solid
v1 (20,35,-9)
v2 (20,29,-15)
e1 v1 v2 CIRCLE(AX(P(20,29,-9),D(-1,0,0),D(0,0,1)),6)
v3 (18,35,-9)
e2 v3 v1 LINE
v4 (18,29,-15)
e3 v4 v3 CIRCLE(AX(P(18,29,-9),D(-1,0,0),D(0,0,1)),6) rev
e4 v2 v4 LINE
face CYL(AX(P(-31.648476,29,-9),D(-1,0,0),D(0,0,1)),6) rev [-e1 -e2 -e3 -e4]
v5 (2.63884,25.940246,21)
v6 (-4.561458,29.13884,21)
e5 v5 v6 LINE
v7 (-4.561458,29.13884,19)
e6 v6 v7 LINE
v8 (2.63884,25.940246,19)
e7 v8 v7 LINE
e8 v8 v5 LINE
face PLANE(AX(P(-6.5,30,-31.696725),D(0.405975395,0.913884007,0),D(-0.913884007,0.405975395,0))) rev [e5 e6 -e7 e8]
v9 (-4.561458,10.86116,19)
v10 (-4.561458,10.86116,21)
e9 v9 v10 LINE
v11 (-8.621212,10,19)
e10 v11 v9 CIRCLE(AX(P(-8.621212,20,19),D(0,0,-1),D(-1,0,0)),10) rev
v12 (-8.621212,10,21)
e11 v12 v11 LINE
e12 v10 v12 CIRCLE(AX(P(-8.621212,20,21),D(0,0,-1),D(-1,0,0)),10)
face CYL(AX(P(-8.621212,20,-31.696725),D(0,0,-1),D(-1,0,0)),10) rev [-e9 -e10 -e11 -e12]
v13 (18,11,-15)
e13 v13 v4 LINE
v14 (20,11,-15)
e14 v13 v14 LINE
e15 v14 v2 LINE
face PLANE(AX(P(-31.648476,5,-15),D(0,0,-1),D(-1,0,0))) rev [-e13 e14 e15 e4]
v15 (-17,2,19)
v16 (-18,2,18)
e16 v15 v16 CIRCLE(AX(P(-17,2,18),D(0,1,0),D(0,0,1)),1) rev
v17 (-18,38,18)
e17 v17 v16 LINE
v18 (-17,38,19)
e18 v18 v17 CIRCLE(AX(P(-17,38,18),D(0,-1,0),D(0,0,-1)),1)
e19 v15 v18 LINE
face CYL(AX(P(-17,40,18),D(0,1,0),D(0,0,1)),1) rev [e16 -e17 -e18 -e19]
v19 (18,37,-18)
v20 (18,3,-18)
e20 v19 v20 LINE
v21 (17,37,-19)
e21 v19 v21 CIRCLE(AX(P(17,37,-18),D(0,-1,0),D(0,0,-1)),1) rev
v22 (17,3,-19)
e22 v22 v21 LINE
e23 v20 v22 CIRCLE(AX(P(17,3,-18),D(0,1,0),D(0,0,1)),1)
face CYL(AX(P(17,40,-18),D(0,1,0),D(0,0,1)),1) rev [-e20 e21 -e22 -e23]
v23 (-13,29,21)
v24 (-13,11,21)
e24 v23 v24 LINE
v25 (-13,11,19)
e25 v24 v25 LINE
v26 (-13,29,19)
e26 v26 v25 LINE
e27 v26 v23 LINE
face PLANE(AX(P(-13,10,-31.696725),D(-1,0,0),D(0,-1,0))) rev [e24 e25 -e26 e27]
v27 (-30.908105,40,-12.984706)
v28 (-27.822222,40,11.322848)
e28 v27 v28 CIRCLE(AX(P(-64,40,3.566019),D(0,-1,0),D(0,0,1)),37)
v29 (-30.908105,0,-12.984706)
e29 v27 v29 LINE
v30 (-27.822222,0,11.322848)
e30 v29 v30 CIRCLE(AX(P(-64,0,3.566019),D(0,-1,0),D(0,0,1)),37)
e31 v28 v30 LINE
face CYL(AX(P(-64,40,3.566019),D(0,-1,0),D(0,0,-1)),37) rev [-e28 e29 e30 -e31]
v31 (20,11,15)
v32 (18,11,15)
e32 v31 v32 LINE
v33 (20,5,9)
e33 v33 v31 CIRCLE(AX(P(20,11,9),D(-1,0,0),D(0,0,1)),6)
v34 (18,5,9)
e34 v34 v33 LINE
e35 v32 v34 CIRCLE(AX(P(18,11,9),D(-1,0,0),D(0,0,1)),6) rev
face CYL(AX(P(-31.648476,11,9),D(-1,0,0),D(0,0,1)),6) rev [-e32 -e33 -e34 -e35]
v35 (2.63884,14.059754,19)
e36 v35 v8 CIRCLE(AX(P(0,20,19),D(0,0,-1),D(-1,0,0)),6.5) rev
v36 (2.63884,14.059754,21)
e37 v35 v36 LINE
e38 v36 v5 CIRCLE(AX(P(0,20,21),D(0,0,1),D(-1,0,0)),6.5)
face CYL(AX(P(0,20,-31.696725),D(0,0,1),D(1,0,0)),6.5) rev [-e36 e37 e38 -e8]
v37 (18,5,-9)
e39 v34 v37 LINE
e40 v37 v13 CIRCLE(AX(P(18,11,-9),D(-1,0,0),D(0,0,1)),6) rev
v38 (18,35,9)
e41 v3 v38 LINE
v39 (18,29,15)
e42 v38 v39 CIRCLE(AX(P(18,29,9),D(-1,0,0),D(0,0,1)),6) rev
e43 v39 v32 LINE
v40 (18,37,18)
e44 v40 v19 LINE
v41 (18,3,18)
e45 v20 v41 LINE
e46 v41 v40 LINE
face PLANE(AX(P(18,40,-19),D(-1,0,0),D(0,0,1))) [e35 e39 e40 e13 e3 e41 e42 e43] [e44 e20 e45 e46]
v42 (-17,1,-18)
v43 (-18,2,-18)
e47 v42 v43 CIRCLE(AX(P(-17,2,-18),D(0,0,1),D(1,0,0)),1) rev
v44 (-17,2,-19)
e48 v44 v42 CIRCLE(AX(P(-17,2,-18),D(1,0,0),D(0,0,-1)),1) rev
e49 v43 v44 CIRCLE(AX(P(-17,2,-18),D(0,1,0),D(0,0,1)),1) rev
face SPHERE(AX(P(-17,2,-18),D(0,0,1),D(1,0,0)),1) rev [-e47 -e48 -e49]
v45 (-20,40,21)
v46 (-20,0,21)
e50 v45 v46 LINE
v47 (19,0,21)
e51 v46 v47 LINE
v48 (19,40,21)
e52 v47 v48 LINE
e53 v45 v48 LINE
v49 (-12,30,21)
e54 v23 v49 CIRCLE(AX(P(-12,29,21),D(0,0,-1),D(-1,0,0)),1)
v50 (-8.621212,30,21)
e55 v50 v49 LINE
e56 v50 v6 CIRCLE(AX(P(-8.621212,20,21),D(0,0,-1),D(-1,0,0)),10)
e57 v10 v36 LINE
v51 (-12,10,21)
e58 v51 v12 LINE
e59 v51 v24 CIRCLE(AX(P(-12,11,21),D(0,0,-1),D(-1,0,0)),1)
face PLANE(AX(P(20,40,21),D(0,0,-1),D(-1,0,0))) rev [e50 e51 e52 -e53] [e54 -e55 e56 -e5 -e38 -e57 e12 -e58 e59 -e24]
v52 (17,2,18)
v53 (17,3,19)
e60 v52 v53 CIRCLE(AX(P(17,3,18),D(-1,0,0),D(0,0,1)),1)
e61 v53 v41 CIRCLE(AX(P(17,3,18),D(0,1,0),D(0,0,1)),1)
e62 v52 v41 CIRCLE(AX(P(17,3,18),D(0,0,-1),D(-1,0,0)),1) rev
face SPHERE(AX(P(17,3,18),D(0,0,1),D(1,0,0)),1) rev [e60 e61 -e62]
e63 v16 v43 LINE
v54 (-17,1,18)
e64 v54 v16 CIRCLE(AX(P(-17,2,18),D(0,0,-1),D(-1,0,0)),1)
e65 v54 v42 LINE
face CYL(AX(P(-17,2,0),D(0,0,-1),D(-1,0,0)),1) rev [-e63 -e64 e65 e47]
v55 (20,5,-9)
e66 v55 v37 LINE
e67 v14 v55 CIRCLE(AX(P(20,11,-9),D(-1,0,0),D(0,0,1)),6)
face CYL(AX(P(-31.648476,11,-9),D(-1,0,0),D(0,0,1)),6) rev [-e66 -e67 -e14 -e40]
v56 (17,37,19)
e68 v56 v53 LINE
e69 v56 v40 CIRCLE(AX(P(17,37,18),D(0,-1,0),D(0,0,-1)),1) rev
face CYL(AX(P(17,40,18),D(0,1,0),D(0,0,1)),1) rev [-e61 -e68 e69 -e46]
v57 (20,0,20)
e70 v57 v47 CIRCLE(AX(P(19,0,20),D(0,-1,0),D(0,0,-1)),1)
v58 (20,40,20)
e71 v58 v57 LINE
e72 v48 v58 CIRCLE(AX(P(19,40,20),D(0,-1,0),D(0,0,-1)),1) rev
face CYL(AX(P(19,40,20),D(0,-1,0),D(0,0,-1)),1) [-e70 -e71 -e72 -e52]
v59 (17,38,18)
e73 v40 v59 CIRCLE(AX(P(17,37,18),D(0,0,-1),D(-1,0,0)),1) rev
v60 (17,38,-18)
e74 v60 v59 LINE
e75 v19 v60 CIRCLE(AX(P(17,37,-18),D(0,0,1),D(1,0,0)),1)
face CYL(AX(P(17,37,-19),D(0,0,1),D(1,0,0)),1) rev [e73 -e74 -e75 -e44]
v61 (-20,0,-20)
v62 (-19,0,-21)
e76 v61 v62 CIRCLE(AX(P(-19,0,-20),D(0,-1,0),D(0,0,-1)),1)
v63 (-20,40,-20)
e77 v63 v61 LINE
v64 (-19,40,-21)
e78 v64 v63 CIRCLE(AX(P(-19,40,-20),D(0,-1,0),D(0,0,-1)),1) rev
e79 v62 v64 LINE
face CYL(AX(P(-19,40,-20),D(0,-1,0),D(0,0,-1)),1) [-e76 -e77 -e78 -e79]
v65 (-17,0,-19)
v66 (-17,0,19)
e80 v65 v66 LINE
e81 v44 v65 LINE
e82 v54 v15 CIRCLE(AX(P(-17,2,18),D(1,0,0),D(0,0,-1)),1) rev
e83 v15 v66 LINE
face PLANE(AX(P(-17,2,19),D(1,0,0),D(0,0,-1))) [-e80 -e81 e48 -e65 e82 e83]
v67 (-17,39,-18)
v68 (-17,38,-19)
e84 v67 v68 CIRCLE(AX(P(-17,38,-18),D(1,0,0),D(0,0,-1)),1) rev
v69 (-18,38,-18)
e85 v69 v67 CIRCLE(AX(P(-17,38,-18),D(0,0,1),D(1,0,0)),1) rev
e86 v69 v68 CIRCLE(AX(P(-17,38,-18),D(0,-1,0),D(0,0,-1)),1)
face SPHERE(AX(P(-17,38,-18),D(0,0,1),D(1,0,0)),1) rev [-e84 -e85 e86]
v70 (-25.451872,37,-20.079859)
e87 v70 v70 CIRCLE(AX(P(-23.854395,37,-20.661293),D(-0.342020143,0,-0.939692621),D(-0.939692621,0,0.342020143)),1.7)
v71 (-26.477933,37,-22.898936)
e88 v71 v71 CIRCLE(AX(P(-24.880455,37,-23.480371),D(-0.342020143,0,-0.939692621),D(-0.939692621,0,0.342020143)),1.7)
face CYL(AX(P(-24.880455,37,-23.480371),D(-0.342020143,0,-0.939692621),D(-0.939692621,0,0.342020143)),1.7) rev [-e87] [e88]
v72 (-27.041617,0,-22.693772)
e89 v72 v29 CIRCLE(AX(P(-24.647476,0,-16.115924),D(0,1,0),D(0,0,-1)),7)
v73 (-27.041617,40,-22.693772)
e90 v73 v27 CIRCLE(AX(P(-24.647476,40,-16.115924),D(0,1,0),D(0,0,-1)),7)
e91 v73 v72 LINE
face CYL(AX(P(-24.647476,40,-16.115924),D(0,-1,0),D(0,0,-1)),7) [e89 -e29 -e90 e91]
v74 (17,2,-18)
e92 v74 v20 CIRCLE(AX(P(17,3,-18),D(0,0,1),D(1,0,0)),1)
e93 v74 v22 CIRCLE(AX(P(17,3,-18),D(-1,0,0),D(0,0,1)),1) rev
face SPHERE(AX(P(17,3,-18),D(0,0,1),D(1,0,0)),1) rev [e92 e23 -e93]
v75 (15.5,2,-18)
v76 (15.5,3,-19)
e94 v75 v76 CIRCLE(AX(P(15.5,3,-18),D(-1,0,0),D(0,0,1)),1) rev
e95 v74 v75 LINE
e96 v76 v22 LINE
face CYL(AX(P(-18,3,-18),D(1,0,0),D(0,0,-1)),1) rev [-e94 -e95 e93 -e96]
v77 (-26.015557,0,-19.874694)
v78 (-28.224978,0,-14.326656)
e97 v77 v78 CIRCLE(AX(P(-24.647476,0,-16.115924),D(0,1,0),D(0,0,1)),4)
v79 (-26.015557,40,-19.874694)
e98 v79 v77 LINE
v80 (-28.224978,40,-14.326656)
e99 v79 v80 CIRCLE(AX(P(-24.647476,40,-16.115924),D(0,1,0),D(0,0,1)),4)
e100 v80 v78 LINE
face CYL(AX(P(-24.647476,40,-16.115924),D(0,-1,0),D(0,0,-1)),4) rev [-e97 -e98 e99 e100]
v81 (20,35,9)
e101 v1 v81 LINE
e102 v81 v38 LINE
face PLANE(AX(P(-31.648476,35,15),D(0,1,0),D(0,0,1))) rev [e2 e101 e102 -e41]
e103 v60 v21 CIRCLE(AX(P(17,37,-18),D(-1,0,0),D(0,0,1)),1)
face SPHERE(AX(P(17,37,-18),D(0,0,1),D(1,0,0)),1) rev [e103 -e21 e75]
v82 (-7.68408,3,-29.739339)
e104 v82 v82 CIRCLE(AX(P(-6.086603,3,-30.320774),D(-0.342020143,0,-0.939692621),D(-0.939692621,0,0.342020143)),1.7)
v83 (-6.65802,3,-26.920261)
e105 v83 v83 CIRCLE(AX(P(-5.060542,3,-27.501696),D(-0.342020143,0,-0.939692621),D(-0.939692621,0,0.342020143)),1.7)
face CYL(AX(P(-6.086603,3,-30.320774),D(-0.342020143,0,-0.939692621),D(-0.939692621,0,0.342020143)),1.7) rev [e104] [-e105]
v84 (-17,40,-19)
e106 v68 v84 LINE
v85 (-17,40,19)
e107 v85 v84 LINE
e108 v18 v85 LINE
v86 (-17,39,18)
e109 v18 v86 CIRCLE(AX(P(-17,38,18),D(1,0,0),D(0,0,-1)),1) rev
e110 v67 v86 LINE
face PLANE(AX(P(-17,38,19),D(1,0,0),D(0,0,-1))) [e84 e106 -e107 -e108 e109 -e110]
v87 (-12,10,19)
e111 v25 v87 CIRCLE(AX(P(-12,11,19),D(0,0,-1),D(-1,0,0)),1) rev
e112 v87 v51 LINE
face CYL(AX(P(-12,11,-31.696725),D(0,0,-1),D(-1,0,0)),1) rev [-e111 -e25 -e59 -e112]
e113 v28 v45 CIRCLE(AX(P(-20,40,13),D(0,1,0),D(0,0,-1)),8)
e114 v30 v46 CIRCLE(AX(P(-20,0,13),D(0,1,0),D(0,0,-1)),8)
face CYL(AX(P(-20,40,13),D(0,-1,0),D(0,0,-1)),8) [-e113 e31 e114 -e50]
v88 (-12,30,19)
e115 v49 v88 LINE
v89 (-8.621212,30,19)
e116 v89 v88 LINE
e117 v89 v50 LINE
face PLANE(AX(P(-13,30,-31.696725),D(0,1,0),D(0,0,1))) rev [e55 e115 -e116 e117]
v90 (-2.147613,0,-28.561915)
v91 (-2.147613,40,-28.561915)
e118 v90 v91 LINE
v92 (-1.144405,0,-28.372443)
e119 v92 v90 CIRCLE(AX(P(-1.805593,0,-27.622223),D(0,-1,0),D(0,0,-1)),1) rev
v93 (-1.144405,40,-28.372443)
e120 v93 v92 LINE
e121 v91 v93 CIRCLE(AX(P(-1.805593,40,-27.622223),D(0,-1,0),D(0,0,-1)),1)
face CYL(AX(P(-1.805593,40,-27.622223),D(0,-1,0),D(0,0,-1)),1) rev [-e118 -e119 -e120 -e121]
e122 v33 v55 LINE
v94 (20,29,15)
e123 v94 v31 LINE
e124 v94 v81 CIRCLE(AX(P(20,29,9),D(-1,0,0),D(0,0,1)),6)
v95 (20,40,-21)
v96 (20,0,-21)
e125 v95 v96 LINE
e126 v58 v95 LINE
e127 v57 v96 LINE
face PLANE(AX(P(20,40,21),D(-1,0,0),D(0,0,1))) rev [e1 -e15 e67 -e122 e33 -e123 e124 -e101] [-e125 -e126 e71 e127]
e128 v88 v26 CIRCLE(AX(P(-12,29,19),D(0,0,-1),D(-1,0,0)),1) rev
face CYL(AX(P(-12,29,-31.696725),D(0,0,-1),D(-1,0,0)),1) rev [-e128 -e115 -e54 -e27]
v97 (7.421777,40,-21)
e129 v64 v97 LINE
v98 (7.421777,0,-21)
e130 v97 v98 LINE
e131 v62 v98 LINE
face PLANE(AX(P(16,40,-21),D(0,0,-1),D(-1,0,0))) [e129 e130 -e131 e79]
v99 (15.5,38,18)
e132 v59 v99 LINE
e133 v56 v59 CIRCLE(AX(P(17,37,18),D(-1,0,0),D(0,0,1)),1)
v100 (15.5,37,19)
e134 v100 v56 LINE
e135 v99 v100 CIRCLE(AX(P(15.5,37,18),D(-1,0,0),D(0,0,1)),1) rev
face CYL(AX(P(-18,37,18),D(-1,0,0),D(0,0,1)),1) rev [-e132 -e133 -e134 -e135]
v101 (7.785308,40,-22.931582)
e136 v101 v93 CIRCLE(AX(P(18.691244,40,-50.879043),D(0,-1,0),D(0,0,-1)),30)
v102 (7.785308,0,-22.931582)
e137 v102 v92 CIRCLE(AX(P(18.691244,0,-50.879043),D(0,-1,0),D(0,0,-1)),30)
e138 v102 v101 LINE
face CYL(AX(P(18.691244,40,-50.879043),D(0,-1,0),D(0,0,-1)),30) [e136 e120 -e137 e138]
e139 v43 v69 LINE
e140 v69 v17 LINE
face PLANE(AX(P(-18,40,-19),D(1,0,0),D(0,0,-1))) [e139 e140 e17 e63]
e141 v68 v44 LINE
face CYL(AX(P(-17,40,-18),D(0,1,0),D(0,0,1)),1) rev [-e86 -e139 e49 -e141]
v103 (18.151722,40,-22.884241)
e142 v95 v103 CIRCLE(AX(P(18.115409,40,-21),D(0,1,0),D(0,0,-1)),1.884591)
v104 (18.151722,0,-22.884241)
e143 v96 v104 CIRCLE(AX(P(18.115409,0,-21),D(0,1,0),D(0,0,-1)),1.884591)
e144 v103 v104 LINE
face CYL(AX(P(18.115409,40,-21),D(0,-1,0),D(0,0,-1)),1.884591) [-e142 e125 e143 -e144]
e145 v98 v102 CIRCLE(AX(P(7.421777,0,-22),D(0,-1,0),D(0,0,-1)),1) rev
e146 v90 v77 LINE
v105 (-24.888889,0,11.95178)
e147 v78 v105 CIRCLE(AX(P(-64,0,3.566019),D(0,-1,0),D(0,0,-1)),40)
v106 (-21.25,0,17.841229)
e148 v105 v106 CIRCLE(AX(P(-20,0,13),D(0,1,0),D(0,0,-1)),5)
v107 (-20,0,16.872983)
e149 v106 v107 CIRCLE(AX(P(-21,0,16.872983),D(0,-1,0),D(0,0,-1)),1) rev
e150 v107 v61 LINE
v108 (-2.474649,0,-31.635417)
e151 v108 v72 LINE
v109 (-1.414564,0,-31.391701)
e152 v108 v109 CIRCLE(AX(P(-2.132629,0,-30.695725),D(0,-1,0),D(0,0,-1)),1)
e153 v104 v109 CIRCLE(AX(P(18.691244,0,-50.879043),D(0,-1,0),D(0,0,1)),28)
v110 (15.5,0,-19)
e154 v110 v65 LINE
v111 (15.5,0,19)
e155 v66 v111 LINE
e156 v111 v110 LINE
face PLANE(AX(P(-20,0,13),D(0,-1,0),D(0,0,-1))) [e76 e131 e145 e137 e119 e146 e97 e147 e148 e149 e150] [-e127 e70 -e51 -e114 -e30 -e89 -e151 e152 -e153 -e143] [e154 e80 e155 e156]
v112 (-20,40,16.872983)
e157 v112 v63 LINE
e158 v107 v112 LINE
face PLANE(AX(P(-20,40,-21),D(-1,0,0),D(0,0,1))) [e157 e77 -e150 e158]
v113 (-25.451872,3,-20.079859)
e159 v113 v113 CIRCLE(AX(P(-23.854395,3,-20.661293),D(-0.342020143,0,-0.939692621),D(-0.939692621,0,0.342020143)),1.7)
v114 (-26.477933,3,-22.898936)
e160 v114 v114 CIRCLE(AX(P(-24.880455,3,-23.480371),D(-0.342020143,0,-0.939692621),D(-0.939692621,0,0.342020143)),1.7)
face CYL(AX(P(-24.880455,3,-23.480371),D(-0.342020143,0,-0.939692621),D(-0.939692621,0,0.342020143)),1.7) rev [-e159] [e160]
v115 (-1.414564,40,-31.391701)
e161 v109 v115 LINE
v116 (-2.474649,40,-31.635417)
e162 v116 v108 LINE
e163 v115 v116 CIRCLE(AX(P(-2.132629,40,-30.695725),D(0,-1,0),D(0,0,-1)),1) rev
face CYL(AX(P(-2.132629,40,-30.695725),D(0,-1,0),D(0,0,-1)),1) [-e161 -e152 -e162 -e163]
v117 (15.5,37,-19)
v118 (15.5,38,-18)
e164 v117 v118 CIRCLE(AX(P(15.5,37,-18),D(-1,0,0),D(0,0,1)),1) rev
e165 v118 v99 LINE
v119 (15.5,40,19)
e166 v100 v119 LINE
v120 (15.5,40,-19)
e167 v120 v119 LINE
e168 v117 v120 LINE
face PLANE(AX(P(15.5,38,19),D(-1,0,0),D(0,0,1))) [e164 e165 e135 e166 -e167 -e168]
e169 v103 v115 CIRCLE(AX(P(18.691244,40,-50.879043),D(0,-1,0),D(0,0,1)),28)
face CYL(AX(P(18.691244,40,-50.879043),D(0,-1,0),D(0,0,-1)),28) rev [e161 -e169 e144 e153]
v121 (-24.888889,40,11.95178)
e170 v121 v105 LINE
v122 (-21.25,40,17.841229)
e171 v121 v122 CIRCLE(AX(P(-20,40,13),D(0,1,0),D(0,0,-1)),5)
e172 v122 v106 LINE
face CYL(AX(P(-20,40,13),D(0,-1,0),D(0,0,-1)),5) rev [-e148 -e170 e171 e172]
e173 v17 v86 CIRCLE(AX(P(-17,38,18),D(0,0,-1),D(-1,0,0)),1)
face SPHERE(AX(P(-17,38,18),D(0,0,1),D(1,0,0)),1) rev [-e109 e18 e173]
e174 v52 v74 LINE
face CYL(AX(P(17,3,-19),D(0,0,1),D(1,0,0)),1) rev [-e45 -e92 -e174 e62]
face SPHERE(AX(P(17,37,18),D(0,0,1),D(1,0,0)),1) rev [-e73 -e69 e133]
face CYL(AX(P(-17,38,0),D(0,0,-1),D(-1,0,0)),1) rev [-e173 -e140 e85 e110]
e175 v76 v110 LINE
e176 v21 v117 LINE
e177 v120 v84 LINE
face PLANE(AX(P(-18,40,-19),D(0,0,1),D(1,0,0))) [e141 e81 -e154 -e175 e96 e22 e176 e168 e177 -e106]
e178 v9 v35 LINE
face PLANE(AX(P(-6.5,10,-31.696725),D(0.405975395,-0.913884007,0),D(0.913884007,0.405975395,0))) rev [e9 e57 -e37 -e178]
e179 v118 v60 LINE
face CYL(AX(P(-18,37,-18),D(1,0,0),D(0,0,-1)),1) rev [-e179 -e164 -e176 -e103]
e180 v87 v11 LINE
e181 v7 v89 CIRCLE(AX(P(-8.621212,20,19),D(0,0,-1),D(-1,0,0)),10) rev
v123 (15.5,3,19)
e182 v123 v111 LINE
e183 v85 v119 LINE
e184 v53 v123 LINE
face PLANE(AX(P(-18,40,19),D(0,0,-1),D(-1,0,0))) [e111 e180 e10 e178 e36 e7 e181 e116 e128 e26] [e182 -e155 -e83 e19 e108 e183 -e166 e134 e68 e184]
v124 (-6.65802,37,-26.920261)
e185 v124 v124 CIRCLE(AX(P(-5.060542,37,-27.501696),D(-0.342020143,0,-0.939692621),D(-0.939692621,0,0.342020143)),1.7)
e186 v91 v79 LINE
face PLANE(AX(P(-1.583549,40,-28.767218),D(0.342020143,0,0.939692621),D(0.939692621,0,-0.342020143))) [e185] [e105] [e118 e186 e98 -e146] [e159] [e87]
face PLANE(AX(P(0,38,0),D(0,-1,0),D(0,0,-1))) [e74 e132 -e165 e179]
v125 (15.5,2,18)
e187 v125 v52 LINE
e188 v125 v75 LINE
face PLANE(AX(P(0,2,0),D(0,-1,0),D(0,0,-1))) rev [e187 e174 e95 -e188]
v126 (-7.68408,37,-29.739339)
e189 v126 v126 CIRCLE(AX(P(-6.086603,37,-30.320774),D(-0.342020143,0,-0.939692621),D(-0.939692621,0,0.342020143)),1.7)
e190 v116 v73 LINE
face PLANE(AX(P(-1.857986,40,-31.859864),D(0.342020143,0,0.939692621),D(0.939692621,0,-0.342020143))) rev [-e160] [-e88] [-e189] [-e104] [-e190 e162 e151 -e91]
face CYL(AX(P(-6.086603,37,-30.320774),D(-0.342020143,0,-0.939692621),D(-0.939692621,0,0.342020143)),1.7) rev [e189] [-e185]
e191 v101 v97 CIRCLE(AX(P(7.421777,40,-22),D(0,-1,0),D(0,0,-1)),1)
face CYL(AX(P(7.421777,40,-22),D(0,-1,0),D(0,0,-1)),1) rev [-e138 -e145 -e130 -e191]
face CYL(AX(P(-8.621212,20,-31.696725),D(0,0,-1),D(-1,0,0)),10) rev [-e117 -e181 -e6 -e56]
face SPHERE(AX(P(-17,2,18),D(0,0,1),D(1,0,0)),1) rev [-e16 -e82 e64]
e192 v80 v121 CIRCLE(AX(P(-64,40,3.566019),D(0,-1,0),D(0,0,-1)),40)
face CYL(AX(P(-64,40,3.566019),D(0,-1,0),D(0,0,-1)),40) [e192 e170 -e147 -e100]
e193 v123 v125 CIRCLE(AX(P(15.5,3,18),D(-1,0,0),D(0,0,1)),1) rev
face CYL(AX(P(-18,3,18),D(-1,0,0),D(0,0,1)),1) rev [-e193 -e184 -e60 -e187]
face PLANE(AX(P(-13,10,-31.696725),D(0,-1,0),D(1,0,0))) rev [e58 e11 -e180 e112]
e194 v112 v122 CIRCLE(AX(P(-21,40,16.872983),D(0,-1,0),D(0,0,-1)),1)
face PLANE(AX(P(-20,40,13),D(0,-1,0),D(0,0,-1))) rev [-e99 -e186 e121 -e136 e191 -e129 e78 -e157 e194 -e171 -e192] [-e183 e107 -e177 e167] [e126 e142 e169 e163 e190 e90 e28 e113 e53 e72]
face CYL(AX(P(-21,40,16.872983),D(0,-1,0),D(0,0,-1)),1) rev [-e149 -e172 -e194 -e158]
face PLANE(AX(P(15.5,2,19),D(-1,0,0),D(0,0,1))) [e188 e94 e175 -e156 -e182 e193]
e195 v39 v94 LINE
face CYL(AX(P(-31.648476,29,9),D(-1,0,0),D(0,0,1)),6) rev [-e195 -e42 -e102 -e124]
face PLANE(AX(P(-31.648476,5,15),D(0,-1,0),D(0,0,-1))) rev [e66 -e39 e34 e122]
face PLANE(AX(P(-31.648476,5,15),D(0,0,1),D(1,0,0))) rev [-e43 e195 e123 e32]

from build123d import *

# Parameters (mm, degrees)
SKIZZE1_W                       = 36
SKIZZE1_H                       = 38
AUFSATZ_LINEAR_AUSTRAGEN2_DEPTH = 40
VERRUNDUNG1_R                   = 1
SCHNITT_LINEAR_AUSTRAGEN1_REACH = 74.681
SKIZZE2_W                       = 30
SKIZZE2_H                       = 30
VERRUNDUNG2_R                   = 6
DURCHGANGSLOCH_F_R_M31_D        = 3.4
DURCHGANGSLOCH_F_R_M31_DEPTH    = 3
DURCHGANGSLOCH_F_R_M31_TIP      = 1.021463052
SKIZZE5_W                       = 2.5
SKIZZE5_H                       = 38
SKIZZE5_W_2                     = 1
AUFSATZ_LINEAR_AUSTRAGEN3_DEPTH = 2
SKIZZE8_W                       = 1
SKIZZE8_H                       = 38
SCHNITT_LINEAR_AUSTRAGEN3_DEPTH = 1
SKIZZE6_W                       = 2.5
SKIZZE6_H                       = 38
SKIZZE6_W_2                     = 1
AUFSATZ_LINEAR_AUSTRAGEN4_DEPTH = 2
SKIZZE9_W                       = 1
SKIZZE9_H                       = 38
SCHNITT_LINEAR_AUSTRAGEN4_DEPTH = 1
VERRUNDUNG3_R                   = 1
VERRUNDUNG4_R                   = 1
SCHNITT_LINEAR_AUSTRAGEN2_REACH = 75.338
VERRUNDUNG9_R                   = 1
VERRUNDUNG10_R                  = 10


with BuildPart() as part:
    # Skizze1 → Aufsatz-Linear austragen2 (new body)
    with BuildSketch(Plane(origin=(0, 0, 0), x_dir=(1, 0, 0), z_dir=(0, 1, 0))):
        with BuildLine():
            Line((20, -21), (20, 21))
            ThreePointArc((20, 21), (19.460793496, 22.319706051), (18.151722222, 22.884241359))
            ThreePointArc((18.151722222, 22.884241359), (7.231561818, 25.331524584), (-1.857986079, 31.859864147))
            Line((-1.857986079, 31.859864147), (-27.041617117, 22.693772058))
            ThreePointArc((-27.041617117, 22.693772058), (-31.15076398, 18.70575902), (-30.908104914, 12.984705575))
            ThreePointArc((-30.908104914, 12.984705575), (-27.294602816, 1.09378988), (-27.822222222, -11.322847799))
            ThreePointArc((-27.822222222, -11.322847799), (-26.22162429, -18.029054702), (-20, -21))
            Line((-20, -21), (20, -21))
        make_face()
        Rectangle(SKIZZE1_W, SKIZZE1_H, mode=Mode.SUBTRACT)
        with BuildLine():
            Line((16, 21), (-20, 21))
            Line((-20, 21), (-20, -18))
            ThreePointArc((-20, -18), (-23.888515181, -16.143159189), (-24.888888889, -11.951779874))
            ThreePointArc((-24.888888889, -11.951779874), (-24.318489531, 1.471612211), (-28.224978285, 14.326656205))
            ThreePointArc((-28.224978285, 14.326656205), (-28.363640609, 17.595829603), (-26.015556687, 19.874694196))
            Line((-26.015556687, 19.874694196), (-1.583548546, 28.767217922))
            ThreePointArc((-1.583548546, 28.767217922), (6.56927519, 23.437142814), (16, 21))
        make_face(mode=Mode.SUBTRACT)
    extrude(amount=AUFSATZ_LINEAR_AUSTRAGEN2_DEPTH)

    # Verrundung1
    verrundung1_edges = [part.edges().sort_by_distance(p)[0] for p in [
        (20, 20, 21),
        (16, 20, -21),
        (-1.583548546, 20, -28.767217922),
        (-20, 20, 18),
        (-20, 20, -21),
    ]]
    fillet(verrundung1_edges, radius=VERRUNDUNG1_R)

    # Skizze2 → Schnitt-Linear austragen1 (cut, up to next)
    with BuildSketch(Plane(origin=(20, 0, 0), x_dir=(0, 0, -1), z_dir=(1, 0, 0)), mode=Mode.PRIVATE) as schnitt_linear_austragen1_sk1:
        with Locations((0, 20)):
            Rectangle(SKIZZE2_W, SKIZZE2_H)
    schnitt_linear_austragen1_tool1 = extrude(schnitt_linear_austragen1_sk1.sketch, amount=-SCHNITT_LINEAR_AUSTRAGEN1_REACH, mode=Mode.PRIVATE) & part.part
    add(schnitt_linear_austragen1_tool1.solids().sort_by_distance((20, 20, 0))[0], mode=Mode.SUBTRACT)

    # Verrundung2
    verrundung2_edges = [part.edges().sort_by_distance(p)[0] for p in [
        (19, 5, 15),
        (19, 35, 15),
        (19, 35, -15),
        (19, 5, -15),
    ]]
    fillet(verrundung2_edges, radius=VERRUNDUNG2_R)

    # Durchgangsloch für M31
    with Locations(Plane(origin=(-10.456906044, 0, -28.730113233), x_dir=(-0.9396926207859081, 0, 0.34202014332566955), z_dir=(-0.34202014332566955, 0, -0.9396926207859082))):
        with Locations((-4.650779494, 37), (15.349220506, 3), (-4.650779494, 3), (15.349220506, 37)):
            Hole(DURCHGANGSLOCH_F_R_M31_D / 2, depth=DURCHGANGSLOCH_F_R_M31_DEPTH)
            with Locations((0, 0, -(DURCHGANGSLOCH_F_R_M31_DEPTH + DURCHGANGSLOCH_F_R_M31_TIP / 2))):  # 118° drill point
                Cone(0, DURCHGANGSLOCH_F_R_M31_D / 2, DURCHGANGSLOCH_F_R_M31_TIP, mode=Mode.SUBTRACT)

    # Skizze5 → Aufsatz-Linear austragen3 (add)
    with BuildSketch(Plane.XZ):
        with Locations((16.75, 0)):
            Rectangle(SKIZZE5_W, SKIZZE5_H)
        with Locations((-17.5, 0)):
            Rectangle(SKIZZE5_W_2, SKIZZE5_H)
    extrude(amount=-AUFSATZ_LINEAR_AUSTRAGEN3_DEPTH)

    # Skizze8 → Schnitt-Linear austragen3 (cut)
    with BuildSketch(Plane(origin=(0, 2, 0), x_dir=(1, 0, 0), z_dir=(0, 1, 0))):
        with Locations((-17.5, 0)):
            Rectangle(SKIZZE8_W, SKIZZE8_H)
    extrude(amount=-SCHNITT_LINEAR_AUSTRAGEN3_DEPTH, mode=Mode.SUBTRACT)

    # Skizze6 → Aufsatz-Linear austragen4 (add)
    with BuildSketch(Plane(origin=(0, 40, 0), x_dir=(1, 0, 0), z_dir=(0, 1, 0))):
        with Locations((16.75, 0)):
            Rectangle(SKIZZE6_W, SKIZZE6_H)
        with Locations((-17.5, 0)):
            Rectangle(SKIZZE6_W_2, SKIZZE6_H)
    extrude(amount=-AUFSATZ_LINEAR_AUSTRAGEN4_DEPTH)

    # Skizze9 → Schnitt-Linear austragen4 (cut)
    with BuildSketch(Plane.XZ.offset(-38)):
        with Locations((-17.5, 0)):
            Rectangle(SKIZZE9_W, SKIZZE9_H)
    extrude(amount=-SCHNITT_LINEAR_AUSTRAGEN4_DEPTH, mode=Mode.SUBTRACT)

    # Verrundung3
    verrundung3_edges = [part.edges().sort_by_distance(p)[0] for p in [
        (16.75, 2, 19),
        (18, 2, 0),
        (16.75, 2, -19),
        (-17.5, 1, 19),
        (-18, 1, 0),
        (-17.5, 1, -19),
        (18, 20, -19),
        (18, 20, 19),
        (16.75, 38, -19),
        (18, 38, 0),
        (16.75, 38, 19),
        (-18, 20, -19),
        (-18, 20, 19),
        (-17.5, 39, -19),
        (-18, 39, 0),
        (-17.5, 39, 19),
    ]]
    fillet(verrundung3_edges, radius=VERRUNDUNG3_R - 0.0001)  # a hair under: the kernel refuses the full size

    # Verrundung4
    verrundung4_edges = [part.edges().sort_by_distance(p)[0] for p in [
        (-1.857986079, 20, -31.859864147),
    ]]
    fillet(verrundung4_edges, radius=VERRUNDUNG4_R)

    # Skizze7 → Schnitt-Linear austragen2 (cut, up to next)
    with BuildSketch(Plane.XY.offset(21), mode=Mode.PRIVATE) as schnitt_linear_austragen2_sk1:
        with BuildLine():
            Line((-13, 10), (-6.5, 10))
            Line((-6.5, 10), (2.63884007, 14.059753954))
            ThreePointArc((2.63884007, 14.059753954), (6.5, 20), (2.63884007, 25.940246046))
            Line((2.63884007, 25.940246046), (-6.5, 30))
            Line((-6.5, 30), (-13, 30))
            Line((-13, 30), (-13, 10))
        make_face()
    schnitt_linear_austragen2_tool1 = extrude(schnitt_linear_austragen2_sk1.sketch, amount=-SCHNITT_LINEAR_AUSTRAGEN2_REACH, mode=Mode.PRIVATE) & part.part
    add(schnitt_linear_austragen2_tool1.solids().sort_by_distance((-4.747297, 20, 21))[0], mode=Mode.SUBTRACT)

    # Verrundung9
    verrundung9_edges = [part.edges().sort_by_distance(p)[0] for p in [
        (-13, 10, 20),
        (-13, 30, 20),
    ]]
    fillet(verrundung9_edges, radius=VERRUNDUNG9_R)

    # Verrundung10
    verrundung10_edges = [part.edges().sort_by_distance(p)[0] for p in [
        (-6.5, 30, 20),
        (-6.5, 10, 20),
    ]]
    fillet(verrundung10_edges, radius=VERRUNDUNG10_R)


solid = part.part
